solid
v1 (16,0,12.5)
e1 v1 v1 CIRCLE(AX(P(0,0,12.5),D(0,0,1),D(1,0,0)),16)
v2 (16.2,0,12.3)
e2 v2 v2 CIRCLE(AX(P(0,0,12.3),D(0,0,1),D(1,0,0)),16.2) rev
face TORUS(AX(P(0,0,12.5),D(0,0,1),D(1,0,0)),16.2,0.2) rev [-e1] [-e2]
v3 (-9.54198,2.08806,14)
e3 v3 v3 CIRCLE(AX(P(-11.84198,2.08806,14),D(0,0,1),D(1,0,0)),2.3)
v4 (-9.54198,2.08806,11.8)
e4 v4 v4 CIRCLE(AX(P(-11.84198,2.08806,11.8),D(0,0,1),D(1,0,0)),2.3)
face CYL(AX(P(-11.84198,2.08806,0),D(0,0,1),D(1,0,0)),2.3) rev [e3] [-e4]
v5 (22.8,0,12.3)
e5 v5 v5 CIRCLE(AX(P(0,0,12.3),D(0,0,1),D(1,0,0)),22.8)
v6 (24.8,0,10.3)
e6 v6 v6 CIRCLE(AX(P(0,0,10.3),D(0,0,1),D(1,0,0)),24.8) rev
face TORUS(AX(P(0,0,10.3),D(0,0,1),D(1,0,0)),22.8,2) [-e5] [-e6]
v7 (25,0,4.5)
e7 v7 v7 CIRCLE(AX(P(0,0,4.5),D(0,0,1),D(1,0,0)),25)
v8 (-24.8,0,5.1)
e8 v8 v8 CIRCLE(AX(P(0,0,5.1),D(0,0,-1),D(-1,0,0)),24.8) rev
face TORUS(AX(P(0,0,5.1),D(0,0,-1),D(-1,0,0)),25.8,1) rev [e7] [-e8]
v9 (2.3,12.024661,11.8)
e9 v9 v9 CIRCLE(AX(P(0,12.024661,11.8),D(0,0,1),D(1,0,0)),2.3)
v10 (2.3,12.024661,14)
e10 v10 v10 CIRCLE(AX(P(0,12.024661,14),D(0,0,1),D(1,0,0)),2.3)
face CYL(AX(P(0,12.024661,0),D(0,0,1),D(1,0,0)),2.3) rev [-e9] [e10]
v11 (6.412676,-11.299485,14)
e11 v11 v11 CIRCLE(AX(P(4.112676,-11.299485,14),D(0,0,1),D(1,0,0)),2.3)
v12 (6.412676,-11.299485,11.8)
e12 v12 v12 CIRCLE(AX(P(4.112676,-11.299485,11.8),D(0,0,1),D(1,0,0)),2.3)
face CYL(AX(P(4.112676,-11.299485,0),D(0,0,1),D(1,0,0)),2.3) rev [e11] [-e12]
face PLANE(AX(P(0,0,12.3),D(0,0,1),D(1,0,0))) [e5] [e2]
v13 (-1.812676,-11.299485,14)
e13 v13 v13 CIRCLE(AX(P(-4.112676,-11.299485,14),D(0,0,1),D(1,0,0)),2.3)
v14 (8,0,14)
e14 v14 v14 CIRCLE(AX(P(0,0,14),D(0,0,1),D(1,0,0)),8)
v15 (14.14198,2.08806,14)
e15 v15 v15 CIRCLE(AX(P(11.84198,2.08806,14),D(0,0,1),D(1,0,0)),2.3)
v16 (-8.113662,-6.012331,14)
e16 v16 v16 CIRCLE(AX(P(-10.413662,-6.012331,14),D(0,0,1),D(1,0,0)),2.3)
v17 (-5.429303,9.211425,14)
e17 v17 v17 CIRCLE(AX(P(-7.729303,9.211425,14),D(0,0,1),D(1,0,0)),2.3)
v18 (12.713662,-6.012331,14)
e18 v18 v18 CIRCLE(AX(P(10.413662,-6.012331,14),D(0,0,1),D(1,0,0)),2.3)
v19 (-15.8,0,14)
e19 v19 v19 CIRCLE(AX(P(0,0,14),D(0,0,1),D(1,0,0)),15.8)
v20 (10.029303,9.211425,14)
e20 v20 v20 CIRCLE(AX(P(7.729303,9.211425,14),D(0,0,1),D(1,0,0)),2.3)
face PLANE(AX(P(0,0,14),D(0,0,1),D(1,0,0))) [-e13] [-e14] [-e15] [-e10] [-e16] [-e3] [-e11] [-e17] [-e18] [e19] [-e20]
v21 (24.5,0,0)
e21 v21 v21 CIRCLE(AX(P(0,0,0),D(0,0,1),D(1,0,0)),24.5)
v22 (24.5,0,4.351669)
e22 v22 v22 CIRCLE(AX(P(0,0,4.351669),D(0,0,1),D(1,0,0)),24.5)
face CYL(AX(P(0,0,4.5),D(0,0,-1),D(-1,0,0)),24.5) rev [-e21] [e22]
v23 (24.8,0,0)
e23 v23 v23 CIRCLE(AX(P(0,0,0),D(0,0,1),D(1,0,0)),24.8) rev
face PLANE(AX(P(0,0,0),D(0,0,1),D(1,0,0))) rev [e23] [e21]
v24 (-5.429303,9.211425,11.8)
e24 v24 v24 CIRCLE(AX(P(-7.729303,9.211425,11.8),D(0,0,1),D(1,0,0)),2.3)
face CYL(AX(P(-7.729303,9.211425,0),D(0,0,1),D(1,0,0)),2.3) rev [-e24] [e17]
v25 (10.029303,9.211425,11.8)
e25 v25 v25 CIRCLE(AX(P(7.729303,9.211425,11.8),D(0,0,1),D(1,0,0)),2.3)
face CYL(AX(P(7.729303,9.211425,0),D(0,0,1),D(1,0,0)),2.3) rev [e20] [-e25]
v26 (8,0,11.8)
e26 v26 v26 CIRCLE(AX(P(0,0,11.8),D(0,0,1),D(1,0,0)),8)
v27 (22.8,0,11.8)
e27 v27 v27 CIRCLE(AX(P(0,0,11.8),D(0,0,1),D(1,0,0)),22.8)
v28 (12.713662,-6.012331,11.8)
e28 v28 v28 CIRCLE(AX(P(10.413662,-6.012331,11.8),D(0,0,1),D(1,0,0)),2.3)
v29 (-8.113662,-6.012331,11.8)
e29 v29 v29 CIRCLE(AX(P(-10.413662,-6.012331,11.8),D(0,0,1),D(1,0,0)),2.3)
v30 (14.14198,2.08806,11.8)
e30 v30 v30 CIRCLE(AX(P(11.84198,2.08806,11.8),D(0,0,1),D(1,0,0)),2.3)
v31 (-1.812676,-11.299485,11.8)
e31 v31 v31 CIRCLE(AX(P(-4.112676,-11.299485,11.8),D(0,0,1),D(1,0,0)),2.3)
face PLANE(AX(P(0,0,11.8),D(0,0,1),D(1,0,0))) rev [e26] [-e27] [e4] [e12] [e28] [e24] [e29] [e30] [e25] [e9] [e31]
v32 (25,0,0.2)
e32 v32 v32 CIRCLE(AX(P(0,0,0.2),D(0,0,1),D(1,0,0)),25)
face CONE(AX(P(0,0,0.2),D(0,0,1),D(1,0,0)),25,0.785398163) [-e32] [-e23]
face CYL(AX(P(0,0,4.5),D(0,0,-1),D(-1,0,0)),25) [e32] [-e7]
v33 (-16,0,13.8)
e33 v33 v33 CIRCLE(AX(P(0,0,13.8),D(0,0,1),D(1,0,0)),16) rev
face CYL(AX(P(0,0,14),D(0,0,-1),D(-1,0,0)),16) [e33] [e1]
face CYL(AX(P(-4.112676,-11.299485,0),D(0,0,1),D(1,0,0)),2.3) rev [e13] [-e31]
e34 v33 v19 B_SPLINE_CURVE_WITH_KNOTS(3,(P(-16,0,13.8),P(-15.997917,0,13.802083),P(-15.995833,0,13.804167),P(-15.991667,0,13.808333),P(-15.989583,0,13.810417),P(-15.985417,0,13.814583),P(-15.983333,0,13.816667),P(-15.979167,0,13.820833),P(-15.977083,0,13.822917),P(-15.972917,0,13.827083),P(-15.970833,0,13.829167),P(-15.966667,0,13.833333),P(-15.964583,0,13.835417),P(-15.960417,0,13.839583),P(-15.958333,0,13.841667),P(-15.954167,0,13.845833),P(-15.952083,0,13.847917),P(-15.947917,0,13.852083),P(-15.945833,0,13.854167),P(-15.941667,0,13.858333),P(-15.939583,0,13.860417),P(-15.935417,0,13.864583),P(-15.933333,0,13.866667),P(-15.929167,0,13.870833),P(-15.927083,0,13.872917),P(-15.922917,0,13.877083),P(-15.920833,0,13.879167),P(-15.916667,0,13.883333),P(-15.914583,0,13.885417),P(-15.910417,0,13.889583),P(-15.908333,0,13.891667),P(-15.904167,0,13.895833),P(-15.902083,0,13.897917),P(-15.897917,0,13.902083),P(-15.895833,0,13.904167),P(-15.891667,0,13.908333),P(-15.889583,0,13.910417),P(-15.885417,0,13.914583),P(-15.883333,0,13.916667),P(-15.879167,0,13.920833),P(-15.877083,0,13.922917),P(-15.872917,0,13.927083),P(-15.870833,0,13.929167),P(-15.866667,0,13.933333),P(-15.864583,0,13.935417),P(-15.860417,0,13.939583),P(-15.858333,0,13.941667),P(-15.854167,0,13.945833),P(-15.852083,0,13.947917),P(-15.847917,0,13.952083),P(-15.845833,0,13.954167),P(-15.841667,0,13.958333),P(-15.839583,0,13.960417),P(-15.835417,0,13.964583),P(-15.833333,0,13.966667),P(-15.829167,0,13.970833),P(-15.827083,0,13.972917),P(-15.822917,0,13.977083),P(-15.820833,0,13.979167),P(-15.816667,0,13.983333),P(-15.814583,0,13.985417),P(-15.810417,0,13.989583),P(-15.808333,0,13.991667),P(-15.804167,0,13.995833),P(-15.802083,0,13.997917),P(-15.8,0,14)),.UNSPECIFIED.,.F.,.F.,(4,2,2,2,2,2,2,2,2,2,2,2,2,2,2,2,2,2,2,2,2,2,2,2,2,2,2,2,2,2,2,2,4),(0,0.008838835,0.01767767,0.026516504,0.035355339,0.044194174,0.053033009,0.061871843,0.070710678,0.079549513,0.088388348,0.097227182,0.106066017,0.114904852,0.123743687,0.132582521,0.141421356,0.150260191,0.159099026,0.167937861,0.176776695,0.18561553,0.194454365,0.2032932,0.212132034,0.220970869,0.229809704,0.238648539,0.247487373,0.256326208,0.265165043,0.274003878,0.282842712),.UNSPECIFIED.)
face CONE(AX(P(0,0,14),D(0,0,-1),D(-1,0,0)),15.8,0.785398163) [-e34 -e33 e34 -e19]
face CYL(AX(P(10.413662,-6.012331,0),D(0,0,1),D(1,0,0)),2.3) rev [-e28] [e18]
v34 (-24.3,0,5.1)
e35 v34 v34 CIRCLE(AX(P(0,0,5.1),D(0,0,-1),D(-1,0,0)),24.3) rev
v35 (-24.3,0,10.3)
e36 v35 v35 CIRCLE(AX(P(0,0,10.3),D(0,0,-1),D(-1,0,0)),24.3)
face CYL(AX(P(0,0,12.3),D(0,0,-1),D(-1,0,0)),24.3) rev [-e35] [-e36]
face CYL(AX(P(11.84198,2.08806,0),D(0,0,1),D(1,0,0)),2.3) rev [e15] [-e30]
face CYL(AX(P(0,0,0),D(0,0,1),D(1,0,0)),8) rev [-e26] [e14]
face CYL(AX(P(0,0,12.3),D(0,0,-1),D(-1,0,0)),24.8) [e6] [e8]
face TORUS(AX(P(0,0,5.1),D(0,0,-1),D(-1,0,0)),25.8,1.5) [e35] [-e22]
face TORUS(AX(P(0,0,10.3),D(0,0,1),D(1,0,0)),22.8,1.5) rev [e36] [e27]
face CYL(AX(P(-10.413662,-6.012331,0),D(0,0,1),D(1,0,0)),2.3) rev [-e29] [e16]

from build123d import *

# Parameters (mm, degrees)
SKETCH1_R           = 25
BOSS_EXTRUDE1_DEPTH = 4.5
SKETCH2_R           = 24.8
BOSS_EXTRUDE2_DEPTH = 7.8
FILLET1_R           = 2
FILLET2_R           = 1
SHELL1_T            = -0.5
CHAMFER1_SIZE       = 0.2
SKETCH3_R           = 16
BOSS_EXTRUDE3_DEPTH = 1.7
CHAMFER2_SIZE       = 0.2
FILLET3_R           = 0.2
SKETCH4_R           = 8
SKETCH4_R_2         = 2.3
CUT_EXTRUDE1_DEPTH  = 39.026306684


with BuildPart() as part:
    # Sketch1 → Boss-Extrude1 (new body)
    with BuildSketch(Plane.XY):
        Circle(SKETCH1_R)
    extrude(amount=BOSS_EXTRUDE1_DEPTH)

    # Sketch2 → Boss-Extrude2 (add)
    with BuildSketch(Plane.XY.offset(4.5)):
        Circle(SKETCH2_R)
    extrude(amount=BOSS_EXTRUDE2_DEPTH)

    # Fillet1
    fillet1_edges = [part.edges().sort_by_distance(p)[0] for p in [
        (-24.8, 0, 12.3),
    ]]
    fillet(fillet1_edges, radius=FILLET1_R)

    # Fillet2
    # the kernel refuses this fillet: 1 mm, written as the material it adds along each edge
    with BuildSketch(Plane(origin=(0, 0, 4.5), x_dir=(1, 0, 0), z_dir=(0, -1, 0))) as fillet2_piece_1:
        with BuildLine():
            CenterArc((25.8, 0.6), FILLET2_R, 180, 36.869897646)
            Line((25, 0), (24.984, -0.012))
            ThreePointArc((24.984, -0.012), (24.9, -0.02), (24.8, -0.02))
            Line((24.8, -0.02), (24.78, 0))
            Line((24.78, 0), (24.78, 0.6))
            Line((24.78, 0.6), (24.8, 0.6))
        make_face()
    revolve(axis=Axis((0, 0, 4.5), (0, 0, 1)))

    # Shell1
    shell1_openings = [part.faces().sort_by_distance(p)[0] for p in [
        (0, 0, 0),
    ]]
    offset(amount=SHELL1_T, openings=shell1_openings, kind=Kind.INTERSECTION)

    # Chamfer1
    chamfer1_edges = [part.edges().sort_by_distance(p)[0] for p in [
        (-25, 0, 0),
    ]]
    chamfer(chamfer1_edges, length=CHAMFER1_SIZE)

    # Sketch3 → Boss-Extrude3 (add)
    with BuildSketch(Plane.XY.offset(12.3)):
        Circle(SKETCH3_R)
    extrude(amount=BOSS_EXTRUDE3_DEPTH)

    # Chamfer2
    chamfer2_edges = [part.edges().sort_by_distance(p)[0] for p in [
        (-16, 0, 14),
    ]]
    chamfer(chamfer2_edges, length=CHAMFER2_SIZE)

    # Fillet3
    fillet3_edges = [part.edges().sort_by_distance(p)[0] for p in [
        (-16, 0, 12.3),
    ]]
    fillet(fillet3_edges, radius=FILLET3_R)

    # Sketch4 → Cut-Extrude1 (cut, through all)
    with BuildSketch(Plane.XY.offset(14)):
        Circle(SKETCH4_R)
        with Locations((0, 12.024661136)):
            Circle(SKETCH4_R_2)
        with Locations((7.729303189, 9.211424844)):
            Circle(SKETCH4_R_2)
        with Locations((11.841979514, 2.088060493)):
            Circle(SKETCH4_R_2)
        with Locations((10.413662016, -6.012330568)):
            Circle(SKETCH4_R_2)
        with Locations((4.112676325, -11.299485337)):
            Circle(SKETCH4_R_2)
        with Locations((-4.112676325, -11.299485337)):
            Circle(SKETCH4_R_2)
        with Locations((-10.413662016, -6.012330568)):
            Circle(SKETCH4_R_2)
        with Locations((-11.841979514, 2.088060493)):
            Circle(SKETCH4_R_2)
        with Locations((-7.729303189, 9.211424844)):
            Circle(SKETCH4_R_2)
    extrude(amount=-CUT_EXTRUDE1_DEPTH, mode=Mode.SUBTRACT)


solid = part.part
